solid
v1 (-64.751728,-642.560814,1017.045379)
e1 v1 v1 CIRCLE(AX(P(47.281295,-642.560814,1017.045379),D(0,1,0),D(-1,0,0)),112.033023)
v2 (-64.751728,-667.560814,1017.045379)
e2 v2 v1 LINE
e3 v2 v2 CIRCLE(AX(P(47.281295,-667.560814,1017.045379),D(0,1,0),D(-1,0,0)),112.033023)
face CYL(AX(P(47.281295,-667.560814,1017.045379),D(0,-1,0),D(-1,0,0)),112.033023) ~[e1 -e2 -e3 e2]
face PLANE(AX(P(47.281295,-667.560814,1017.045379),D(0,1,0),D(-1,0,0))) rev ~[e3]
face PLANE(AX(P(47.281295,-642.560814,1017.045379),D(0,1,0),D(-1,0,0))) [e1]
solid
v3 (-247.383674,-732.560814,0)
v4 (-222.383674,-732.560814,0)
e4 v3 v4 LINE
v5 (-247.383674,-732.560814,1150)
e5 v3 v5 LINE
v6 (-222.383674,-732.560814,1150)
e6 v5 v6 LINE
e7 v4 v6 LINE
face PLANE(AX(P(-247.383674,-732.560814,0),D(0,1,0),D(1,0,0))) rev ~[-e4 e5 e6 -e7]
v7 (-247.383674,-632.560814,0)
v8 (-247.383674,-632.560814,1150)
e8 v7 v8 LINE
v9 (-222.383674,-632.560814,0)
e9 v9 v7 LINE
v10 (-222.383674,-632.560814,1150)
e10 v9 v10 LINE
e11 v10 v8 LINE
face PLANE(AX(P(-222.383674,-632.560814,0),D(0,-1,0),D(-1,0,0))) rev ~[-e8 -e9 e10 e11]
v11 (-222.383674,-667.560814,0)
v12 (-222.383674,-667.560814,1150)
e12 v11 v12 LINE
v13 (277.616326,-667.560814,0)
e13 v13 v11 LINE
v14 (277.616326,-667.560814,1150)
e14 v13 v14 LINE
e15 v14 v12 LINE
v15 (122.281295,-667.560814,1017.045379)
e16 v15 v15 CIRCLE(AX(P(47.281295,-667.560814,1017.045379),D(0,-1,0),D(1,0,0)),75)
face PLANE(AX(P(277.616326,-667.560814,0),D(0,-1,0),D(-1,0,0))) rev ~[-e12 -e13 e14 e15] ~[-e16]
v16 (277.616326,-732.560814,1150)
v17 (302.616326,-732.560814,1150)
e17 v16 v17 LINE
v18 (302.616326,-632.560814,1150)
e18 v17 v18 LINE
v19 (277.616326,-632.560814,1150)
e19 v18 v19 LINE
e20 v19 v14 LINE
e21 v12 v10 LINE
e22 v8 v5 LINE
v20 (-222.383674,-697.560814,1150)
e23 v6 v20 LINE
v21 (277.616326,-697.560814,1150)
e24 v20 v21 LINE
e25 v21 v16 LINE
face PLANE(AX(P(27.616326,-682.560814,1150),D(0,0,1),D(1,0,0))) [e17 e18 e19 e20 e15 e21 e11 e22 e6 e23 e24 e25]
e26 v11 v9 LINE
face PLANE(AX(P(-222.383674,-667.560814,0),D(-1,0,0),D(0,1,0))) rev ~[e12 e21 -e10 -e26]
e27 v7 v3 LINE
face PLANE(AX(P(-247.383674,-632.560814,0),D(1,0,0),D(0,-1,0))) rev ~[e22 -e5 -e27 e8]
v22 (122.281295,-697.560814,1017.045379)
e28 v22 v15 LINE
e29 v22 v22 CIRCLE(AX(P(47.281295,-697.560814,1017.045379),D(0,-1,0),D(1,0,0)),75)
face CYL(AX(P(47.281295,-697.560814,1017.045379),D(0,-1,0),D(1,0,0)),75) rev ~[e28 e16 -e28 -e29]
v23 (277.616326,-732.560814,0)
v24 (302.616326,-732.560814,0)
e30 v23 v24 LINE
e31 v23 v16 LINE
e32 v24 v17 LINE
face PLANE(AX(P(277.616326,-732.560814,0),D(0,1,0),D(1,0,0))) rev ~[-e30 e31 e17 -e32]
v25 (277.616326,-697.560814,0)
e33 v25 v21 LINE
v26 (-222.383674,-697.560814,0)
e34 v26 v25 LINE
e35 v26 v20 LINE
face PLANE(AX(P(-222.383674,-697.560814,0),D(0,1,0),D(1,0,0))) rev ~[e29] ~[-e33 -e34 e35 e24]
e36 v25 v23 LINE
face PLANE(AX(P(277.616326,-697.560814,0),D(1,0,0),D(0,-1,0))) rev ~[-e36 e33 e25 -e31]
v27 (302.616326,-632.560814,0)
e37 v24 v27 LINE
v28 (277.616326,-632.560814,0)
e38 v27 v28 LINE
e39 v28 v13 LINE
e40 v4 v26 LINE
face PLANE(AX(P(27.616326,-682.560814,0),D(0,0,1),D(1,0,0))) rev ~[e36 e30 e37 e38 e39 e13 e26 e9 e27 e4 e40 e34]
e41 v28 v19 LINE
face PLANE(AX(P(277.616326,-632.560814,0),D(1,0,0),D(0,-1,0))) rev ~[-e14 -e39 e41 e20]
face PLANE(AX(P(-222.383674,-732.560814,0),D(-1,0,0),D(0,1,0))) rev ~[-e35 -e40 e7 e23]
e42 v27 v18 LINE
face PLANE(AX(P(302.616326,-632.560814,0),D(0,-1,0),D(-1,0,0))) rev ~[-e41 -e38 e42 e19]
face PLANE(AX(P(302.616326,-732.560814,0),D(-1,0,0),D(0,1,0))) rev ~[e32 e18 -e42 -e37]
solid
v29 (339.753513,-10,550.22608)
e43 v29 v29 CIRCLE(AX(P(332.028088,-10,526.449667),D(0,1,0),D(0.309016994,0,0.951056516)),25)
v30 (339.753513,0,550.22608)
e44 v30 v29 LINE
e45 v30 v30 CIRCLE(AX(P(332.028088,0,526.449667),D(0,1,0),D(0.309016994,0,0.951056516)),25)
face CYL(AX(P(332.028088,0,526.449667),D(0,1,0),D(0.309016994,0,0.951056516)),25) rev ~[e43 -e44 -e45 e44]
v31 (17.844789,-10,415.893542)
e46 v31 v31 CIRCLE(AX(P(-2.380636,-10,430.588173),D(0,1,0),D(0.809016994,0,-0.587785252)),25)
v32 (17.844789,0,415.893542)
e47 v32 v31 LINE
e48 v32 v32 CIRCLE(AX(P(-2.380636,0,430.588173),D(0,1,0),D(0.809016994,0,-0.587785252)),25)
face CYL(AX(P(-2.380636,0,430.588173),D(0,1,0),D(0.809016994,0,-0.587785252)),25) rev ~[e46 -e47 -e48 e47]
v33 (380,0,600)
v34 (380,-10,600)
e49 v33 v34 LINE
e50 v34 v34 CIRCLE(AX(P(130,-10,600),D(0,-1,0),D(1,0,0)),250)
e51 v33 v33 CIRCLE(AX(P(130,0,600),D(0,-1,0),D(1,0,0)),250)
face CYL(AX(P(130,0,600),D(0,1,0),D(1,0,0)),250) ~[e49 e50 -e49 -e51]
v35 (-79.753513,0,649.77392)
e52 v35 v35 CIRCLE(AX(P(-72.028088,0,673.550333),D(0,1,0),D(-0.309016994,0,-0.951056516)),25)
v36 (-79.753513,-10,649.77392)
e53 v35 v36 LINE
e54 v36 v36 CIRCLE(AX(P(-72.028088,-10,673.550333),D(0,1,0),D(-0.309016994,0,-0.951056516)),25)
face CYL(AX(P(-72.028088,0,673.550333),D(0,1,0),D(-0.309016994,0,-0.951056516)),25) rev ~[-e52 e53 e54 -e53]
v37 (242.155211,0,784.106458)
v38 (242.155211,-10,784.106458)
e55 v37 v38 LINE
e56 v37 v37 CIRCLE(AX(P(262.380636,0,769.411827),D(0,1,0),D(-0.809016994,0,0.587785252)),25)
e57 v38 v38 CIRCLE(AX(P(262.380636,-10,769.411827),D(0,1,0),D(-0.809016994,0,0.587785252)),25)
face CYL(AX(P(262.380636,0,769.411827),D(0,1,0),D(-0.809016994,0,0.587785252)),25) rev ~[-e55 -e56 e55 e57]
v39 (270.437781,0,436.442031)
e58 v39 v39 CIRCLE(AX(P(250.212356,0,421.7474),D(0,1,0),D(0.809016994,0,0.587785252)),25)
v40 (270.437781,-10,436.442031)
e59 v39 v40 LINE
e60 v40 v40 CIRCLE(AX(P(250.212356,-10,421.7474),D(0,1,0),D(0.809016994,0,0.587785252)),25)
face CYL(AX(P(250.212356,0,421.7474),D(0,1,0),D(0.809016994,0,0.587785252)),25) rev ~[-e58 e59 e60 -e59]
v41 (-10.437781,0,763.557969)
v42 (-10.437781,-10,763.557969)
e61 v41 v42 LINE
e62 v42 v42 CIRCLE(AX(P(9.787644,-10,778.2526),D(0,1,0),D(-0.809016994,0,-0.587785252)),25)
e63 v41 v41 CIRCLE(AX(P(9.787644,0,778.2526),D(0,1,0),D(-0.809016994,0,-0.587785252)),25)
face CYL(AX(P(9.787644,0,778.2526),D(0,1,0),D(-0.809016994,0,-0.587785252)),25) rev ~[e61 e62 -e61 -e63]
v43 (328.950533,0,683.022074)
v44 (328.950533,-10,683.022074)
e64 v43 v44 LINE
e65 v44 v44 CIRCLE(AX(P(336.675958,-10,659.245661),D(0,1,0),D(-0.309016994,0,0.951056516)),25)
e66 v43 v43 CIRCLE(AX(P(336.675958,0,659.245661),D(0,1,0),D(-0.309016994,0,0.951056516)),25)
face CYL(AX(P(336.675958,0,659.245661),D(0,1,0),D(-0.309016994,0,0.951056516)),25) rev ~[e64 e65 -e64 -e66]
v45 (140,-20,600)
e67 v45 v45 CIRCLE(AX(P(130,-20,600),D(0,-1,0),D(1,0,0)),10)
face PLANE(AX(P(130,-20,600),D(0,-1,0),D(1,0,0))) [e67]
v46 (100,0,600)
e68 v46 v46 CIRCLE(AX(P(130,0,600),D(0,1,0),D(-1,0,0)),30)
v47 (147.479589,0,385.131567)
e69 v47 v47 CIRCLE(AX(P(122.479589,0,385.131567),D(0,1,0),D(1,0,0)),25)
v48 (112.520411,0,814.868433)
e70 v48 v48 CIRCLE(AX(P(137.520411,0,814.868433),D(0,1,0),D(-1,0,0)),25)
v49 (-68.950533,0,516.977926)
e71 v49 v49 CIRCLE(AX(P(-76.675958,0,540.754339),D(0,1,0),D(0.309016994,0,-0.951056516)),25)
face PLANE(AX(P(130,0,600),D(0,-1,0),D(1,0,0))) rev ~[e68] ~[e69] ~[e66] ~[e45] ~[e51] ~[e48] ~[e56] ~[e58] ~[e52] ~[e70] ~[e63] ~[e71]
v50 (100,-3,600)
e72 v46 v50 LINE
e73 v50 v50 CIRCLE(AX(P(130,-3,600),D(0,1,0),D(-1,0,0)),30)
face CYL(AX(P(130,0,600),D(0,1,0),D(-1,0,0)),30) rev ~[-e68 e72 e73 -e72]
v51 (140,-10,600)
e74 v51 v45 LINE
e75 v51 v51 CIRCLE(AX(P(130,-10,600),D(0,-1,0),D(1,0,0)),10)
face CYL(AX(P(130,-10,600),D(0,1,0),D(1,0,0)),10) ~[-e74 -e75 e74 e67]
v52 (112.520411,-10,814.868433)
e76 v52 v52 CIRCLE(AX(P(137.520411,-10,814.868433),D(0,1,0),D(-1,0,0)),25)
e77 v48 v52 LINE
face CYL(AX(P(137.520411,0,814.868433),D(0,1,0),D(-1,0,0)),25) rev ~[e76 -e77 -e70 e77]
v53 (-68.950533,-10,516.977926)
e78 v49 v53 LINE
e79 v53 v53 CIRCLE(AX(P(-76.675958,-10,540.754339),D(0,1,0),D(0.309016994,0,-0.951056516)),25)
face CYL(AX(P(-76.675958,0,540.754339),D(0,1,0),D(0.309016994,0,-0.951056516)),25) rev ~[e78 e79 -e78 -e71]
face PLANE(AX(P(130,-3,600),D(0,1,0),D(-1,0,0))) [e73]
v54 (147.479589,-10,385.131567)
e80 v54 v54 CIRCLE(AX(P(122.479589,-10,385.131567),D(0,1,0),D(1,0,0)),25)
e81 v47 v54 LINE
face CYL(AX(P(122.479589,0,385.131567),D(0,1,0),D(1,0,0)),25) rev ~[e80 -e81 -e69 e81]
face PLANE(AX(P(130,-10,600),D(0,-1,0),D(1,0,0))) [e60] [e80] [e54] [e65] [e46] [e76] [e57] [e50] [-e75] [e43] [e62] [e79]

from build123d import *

# Parameters (mm, degrees)
F0_R            = 250
F1_DEPTH        = 10
F3_R            = 10
F4_DEPTH        = 10
F5_R            = 30
F6_DEPTH        = 3
F2_R            = 25
F7_DEPTH        = 10
F7_COPIES_COUNT = 10
F9_DEPTH        = 1150
F10_R           = 75
F11_DEPTH       = 30
F12_R           = 112.0330230735
F13_DEPTH       = 25


# Not quite as in the source:
# - a pattern or mirror of a feature is missing from the dataset's text; its kind, count and spacing are read off the source's solid


with BuildPart() as f1:
    # F0 (on Front) → F1 (new body)
    with BuildSketch(Plane.XZ):
        with Locations((130, 600)):
            Circle(F0_R)
    extrude(amount=F1_DEPTH)

    # F3 (on face) → F4 (join)
    with BuildSketch(Plane.XZ.offset(10)):
        with Locations((130, 600)):
            Circle(F3_R)
    extrude(amount=F4_DEPTH)

    # F5 (on face) → F6 (cut)
    with BuildSketch(Plane(origin=(0, 0, 0), x_dir=(-1, 0, 0), z_dir=(0, 1, 0))):
        with Locations((-130, 600)):
            Circle(F5_R)
    extrude(amount=-F6_DEPTH, mode=Mode.SUBTRACT)

    # F2 (on face) → F7 (cut, through all)
    with BuildSketch(Plane(origin=(0, 0, 0), x_dir=(-1, 0, 0), z_dir=(0, 1, 0))):
        with Locations((-137.5204109389, 814.8684328125)):
            Circle(F2_R)
    f7 = extrude(amount=-F7_DEPTH, mode=Mode.SUBTRACT)

    # F7_copies: F7 ×10 about axis
    f7_copies_axis = Axis((130, 0, 600), (0, 1, 0))
    for i in range(1, F7_COPIES_COUNT):
        add(f7.rotate(f7_copies_axis, i * 360 / F7_COPIES_COUNT), mode=Mode.SUBTRACT)


with BuildPart() as f9:
    # F8 (on Top) → F9 (new body)
    with BuildSketch(Plane.XY):
        Polygon((-222.3836738983, -632.5608144519), (-247.3836738983, -632.5608144519), (-247.3836738983, -732.5608144519), (-222.3836738983, -732.5608144519), (-222.3836738983, -697.5608144519), (277.6163261017, -697.5608144519), (277.6163261017, -732.5608144519), (302.6163261017, -732.5608144519), (302.6163261017, -632.5608144519), (277.6163261017, -632.5608144519), (277.6163261017, -667.5608144519), (-222.3836738983, -667.5608144519), align=None)
    extrude(amount=F9_DEPTH)

    # F10 (on face) → F11 (cut, through all)
    with BuildSketch(Plane.XZ.offset(697.5608144519)):
        with Locations((47.2812950611, 1017.045378685)):
            Circle(F10_R)
    extrude(amount=-F11_DEPTH, mode=Mode.SUBTRACT)


with BuildPart() as f13:
    # F12 (on face) → F13 (new body)
    with BuildSketch(Plane(origin=(0, -667.5608144519, 0), x_dir=(-1, 0, 0), z_dir=(0, 1, 0))):
        with Locations((-47.2812950611, 1017.045378685)):
            Circle(F12_R)
    extrude(amount=F13_DEPTH)


solid = Compound([f1.part, f9.part, f13.part])
